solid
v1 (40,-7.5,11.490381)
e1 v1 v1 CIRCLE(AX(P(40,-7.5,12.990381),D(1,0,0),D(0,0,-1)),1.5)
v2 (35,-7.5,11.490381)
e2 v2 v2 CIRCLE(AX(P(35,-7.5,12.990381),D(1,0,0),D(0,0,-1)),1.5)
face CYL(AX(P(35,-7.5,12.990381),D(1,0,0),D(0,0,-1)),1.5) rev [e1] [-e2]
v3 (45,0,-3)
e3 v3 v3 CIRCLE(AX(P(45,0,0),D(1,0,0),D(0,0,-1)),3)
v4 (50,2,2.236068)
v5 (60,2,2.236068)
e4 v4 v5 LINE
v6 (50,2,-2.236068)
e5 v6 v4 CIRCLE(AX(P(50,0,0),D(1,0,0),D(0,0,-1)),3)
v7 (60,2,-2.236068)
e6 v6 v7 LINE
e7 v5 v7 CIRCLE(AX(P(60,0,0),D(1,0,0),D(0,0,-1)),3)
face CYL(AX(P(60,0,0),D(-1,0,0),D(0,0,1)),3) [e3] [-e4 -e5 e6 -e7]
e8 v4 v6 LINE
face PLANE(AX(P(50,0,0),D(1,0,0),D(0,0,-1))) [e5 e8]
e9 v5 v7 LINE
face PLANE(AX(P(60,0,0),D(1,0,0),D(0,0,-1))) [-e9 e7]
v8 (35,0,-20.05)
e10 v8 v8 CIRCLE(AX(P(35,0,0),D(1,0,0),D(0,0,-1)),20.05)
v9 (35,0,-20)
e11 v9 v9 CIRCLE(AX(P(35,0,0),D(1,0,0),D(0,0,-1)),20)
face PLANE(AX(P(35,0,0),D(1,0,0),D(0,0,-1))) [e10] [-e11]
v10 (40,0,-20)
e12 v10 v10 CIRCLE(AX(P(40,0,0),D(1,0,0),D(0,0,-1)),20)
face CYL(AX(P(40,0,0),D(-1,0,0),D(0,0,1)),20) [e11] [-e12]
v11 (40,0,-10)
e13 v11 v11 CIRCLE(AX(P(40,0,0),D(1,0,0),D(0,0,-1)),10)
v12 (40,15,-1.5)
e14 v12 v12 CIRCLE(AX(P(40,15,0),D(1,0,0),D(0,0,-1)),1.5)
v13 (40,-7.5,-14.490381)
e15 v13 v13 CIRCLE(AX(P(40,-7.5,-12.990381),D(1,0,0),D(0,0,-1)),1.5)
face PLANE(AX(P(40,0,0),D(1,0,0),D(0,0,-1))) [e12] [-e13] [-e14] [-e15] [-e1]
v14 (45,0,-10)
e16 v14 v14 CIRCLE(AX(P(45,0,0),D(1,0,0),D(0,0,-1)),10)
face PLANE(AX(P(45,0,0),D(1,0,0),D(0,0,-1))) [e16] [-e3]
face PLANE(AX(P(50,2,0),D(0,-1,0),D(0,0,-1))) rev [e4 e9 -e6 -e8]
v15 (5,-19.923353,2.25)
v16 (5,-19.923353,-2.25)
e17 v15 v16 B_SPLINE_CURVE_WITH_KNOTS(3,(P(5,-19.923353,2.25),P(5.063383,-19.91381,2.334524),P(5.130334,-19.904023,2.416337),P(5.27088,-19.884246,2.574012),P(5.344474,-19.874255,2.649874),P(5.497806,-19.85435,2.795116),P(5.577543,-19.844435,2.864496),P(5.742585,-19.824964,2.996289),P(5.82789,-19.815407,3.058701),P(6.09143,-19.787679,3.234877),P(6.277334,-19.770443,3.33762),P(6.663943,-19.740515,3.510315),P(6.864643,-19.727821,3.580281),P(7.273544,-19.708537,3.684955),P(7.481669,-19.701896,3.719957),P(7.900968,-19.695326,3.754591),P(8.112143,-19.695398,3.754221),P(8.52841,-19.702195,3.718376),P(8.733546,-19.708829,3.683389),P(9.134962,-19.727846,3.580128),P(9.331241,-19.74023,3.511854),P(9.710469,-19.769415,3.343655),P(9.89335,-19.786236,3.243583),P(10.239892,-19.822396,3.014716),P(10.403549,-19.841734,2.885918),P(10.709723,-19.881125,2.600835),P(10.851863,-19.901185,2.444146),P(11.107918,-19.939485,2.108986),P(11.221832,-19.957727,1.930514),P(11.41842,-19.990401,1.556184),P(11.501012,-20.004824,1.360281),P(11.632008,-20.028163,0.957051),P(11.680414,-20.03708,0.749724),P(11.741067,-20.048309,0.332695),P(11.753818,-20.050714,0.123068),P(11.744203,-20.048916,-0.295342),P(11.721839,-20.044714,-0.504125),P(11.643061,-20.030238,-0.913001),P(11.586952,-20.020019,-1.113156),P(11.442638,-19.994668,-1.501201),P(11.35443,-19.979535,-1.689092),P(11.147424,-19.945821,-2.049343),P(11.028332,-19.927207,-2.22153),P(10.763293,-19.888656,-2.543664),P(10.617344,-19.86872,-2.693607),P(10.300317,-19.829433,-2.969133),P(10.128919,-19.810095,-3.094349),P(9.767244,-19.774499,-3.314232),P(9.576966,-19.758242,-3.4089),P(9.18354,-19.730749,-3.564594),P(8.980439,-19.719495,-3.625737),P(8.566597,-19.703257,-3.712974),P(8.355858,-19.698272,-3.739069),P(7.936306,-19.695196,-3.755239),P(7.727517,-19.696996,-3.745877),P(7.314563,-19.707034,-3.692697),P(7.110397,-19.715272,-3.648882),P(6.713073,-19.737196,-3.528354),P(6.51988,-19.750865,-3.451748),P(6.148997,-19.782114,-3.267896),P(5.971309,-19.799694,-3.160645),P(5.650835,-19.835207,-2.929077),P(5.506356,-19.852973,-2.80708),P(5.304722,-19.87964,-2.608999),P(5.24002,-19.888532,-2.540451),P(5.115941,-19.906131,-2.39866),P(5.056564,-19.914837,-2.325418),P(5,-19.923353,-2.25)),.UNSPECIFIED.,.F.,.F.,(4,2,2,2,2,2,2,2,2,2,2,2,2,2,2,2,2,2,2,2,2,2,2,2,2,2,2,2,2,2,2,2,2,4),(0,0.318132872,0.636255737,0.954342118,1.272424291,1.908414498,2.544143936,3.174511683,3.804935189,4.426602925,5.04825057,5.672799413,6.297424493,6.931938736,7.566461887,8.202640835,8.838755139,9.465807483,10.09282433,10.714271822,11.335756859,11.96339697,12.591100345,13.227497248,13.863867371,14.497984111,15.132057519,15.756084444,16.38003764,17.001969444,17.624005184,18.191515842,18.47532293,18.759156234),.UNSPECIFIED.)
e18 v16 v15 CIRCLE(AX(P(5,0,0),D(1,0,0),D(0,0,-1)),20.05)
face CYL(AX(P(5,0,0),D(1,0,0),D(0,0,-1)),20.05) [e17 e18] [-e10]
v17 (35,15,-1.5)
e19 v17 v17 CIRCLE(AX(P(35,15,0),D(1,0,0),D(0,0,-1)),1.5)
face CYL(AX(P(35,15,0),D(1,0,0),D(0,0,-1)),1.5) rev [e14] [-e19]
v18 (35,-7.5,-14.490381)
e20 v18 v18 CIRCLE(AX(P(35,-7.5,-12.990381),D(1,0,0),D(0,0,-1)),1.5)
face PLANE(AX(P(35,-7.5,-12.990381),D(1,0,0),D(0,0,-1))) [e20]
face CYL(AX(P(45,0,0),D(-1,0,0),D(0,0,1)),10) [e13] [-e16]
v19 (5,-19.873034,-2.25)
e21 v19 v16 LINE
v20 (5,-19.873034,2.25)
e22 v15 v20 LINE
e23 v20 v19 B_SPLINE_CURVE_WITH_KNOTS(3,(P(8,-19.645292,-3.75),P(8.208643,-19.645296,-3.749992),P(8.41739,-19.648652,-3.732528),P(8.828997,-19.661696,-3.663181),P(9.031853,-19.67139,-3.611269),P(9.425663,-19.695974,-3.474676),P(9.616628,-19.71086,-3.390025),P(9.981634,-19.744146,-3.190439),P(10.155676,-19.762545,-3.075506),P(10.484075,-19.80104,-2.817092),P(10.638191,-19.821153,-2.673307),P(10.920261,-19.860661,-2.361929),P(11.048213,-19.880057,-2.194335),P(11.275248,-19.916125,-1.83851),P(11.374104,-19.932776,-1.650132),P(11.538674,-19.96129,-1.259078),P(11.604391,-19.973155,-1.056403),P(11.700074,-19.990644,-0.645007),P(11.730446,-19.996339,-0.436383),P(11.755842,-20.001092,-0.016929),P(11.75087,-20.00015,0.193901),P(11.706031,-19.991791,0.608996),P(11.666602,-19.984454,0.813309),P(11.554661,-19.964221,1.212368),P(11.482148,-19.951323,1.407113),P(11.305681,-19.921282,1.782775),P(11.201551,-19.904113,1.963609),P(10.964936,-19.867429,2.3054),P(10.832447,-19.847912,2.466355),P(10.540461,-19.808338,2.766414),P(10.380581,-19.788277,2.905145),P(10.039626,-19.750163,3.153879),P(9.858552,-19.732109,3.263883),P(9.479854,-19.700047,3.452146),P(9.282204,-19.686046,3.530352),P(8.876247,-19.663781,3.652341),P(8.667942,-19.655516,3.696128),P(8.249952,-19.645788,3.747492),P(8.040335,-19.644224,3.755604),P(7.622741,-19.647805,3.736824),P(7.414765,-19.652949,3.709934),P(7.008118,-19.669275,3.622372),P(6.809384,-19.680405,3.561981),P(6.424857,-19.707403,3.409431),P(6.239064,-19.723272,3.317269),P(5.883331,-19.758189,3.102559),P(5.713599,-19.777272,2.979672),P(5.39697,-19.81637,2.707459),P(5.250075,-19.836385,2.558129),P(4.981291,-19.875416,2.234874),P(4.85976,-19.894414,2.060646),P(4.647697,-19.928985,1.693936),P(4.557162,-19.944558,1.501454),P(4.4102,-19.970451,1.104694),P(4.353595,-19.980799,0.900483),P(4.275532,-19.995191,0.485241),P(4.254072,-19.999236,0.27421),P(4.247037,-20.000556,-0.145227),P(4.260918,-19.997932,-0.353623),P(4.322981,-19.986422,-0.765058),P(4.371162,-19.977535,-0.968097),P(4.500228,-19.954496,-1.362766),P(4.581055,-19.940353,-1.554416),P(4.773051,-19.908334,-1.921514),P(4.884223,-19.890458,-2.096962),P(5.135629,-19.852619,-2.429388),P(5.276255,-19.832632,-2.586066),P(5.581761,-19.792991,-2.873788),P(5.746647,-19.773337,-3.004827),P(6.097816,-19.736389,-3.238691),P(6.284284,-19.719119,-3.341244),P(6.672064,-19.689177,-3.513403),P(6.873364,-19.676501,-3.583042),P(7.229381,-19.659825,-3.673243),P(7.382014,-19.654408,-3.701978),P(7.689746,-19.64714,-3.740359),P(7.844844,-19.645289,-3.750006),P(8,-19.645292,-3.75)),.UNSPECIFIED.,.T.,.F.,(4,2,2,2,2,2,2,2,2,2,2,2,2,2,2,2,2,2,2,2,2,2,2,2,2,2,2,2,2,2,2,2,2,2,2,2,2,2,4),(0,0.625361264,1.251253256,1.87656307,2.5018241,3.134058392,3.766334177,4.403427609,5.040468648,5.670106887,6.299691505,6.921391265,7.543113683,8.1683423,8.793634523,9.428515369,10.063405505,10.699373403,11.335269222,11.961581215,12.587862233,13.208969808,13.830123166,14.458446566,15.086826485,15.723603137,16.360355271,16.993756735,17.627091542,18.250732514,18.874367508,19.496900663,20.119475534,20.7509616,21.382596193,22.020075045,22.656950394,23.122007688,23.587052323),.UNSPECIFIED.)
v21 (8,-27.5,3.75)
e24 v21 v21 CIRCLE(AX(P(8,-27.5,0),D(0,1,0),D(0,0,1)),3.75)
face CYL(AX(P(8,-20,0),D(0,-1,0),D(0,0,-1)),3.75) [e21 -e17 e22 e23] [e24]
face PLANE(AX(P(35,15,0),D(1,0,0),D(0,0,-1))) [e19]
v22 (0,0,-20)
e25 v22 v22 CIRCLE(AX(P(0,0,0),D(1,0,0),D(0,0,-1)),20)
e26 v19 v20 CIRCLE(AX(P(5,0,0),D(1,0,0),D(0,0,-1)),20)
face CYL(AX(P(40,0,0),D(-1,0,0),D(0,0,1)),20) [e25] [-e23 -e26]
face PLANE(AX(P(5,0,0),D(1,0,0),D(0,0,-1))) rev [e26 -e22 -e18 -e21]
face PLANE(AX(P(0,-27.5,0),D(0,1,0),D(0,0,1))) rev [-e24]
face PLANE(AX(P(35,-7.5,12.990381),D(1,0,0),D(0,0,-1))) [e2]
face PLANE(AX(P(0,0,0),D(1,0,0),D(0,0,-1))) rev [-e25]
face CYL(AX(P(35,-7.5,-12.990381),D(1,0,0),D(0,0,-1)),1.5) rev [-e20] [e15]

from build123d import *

# Parameters (mm, degrees)
CROQUIS1_R                  = 20
SALIENTE_EXTRUIR1_DEPTH     = 40
CROQUIS2_R                  = 10
SALIENTE_EXTRUIR2_DEPTH     = 5
CROQUIS4_R                  = 1.5
CORTAR_EXTRUIR1_DEPTH       = 5
CROQUIS5_R                  = 3
SALIENTE_EXTRUIR3_DEPTH     = 15
CORTAR_EXTRUIR2_START       = -10
CORTAR_EXTRUIR2_DEPTH       = 10
SALIENTE_EXTRUIR4_START     = -27.5
SALIENTE_EXTRUIR4_OUTLINE_R = 3.75
SALIENTE_EXTRUIR4_DEPTH     = 7.854707334
SALIENTE_EXTRUIR4_START_2   = 3
SALIENTE_EXTRUIR4_2_DEPTH   = 10
SALIENTE_EXTRUIR6_START     = 5
SALIENTE_EXTRUIR6_OUTLINE_R = 20.05
SALIENTE_EXTRUIR6_DEPTH     = 30


with BuildPart() as part:
    # Croquis1 → Saliente-Extruir1 (new body)
    with BuildSketch(Plane(origin=(0, 0, 0), x_dir=(0, 0, -1), z_dir=(1, 0, 0))):
        Circle(CROQUIS1_R)
    extrude(amount=SALIENTE_EXTRUIR1_DEPTH)

    # Croquis2 → Saliente-Extruir2 (add)
    with BuildSketch(Plane(origin=(40, 0, 0), x_dir=(0, 0, -1), z_dir=(1, 0, 0))):
        Circle(CROQUIS2_R)
    extrude(amount=SALIENTE_EXTRUIR2_DEPTH)

    # Croquis4 → Cortar-Extruir1 (cut)
    with BuildSketch(Plane(origin=(40, 0, 0), x_dir=(0, 0, -1), z_dir=(1, 0, 0))):
        with Locations((0, 15)):
            Circle(CROQUIS4_R)
        with Locations((12.990381057, -7.5)):
            Circle(CROQUIS4_R)
        with Locations((-12.990381057, -7.5)):
            Circle(CROQUIS4_R)
    extrude(amount=-CORTAR_EXTRUIR1_DEPTH, mode=Mode.SUBTRACT)

    # Croquis5 → Saliente-Extruir3 (add)
    with BuildSketch(Plane(origin=(45, 0, 0), x_dir=(0, 0, -1), z_dir=(1, 0, 0))):
        Circle(CROQUIS5_R)
    extrude(amount=SALIENTE_EXTRUIR3_DEPTH)

    # Croquis6 → Cortar-Extruir2 (cut)
    with BuildSketch(Plane(origin=(60, 0, 0), x_dir=(0, 0, -1), z_dir=(1, 0, 0)).offset(CORTAR_EXTRUIR2_START)):
        with BuildLine():
            Line((0, 2), (-2.236067977, 2))
            ThreePointArc((-2.236067977, 2), (0, 3), (2.236067977, 2))
            Line((2.236067977, 2), (0, 2))
        make_face()
    extrude(amount=CORTAR_EXTRUIR2_DEPTH, mode=Mode.SUBTRACT)



with BuildPart() as body_2:
    # Saliente-Extruir4: read off the stored shape, not the designer's step
    # Saliente-Extruir4 outline → Saliente-Extruir4 (new body)
    with BuildSketch(Plane(origin=(0, 0, 0), x_dir=(1, 0, 0), z_dir=(0, 1, 0)).offset(SALIENTE_EXTRUIR4_START)):
        with Locations((8, 0)):
            Circle(SALIENTE_EXTRUIR4_OUTLINE_R)
    extrude(amount=SALIENTE_EXTRUIR4_DEPTH)

    # Saliente-Extruir4 2 outline → Saliente-Extruir4 2 (cut)
    with BuildSketch(Plane.YZ.offset(SALIENTE_EXTRUIR4_START_2)):
        with BuildLine():
            ThreePointArc((-19.645292078, 3.749999888), (-20, 0), (-19.645292078, -3.749999888))
            Line((-19.645292078, -3.749999888), (-19.645292078, 3.749999888))
        make_face()
    extrude(amount=SALIENTE_EXTRUIR4_2_DEPTH, mode=Mode.SUBTRACT)


with BuildPart() as part_1:
    add(part.part)

    add(body_2.part)  # Saliente-Extruir6 merges body 2
    # Saliente-Extruir6: read off the stored shape, not the designer's step
    # Saliente-Extruir6 outline → Saliente-Extruir6 (add)
    with BuildSketch(Plane.YZ.offset(SALIENTE_EXTRUIR6_START)):
        Circle(SALIENTE_EXTRUIR6_OUTLINE_R)
        with BuildLine():
            ThreePointArc((-19.645240114, 3.750272106), (20, -7.213e-06), (-19.645242819, -3.750257935))
            ThreePointArc((-19.645242819, -3.750257935), (-20, 7.213e-06), (-19.645240114, 3.750272106))
        make_face(mode=Mode.SUBTRACT)
    extrude(amount=SALIENTE_EXTRUIR6_DEPTH)


solid = part_1.part
